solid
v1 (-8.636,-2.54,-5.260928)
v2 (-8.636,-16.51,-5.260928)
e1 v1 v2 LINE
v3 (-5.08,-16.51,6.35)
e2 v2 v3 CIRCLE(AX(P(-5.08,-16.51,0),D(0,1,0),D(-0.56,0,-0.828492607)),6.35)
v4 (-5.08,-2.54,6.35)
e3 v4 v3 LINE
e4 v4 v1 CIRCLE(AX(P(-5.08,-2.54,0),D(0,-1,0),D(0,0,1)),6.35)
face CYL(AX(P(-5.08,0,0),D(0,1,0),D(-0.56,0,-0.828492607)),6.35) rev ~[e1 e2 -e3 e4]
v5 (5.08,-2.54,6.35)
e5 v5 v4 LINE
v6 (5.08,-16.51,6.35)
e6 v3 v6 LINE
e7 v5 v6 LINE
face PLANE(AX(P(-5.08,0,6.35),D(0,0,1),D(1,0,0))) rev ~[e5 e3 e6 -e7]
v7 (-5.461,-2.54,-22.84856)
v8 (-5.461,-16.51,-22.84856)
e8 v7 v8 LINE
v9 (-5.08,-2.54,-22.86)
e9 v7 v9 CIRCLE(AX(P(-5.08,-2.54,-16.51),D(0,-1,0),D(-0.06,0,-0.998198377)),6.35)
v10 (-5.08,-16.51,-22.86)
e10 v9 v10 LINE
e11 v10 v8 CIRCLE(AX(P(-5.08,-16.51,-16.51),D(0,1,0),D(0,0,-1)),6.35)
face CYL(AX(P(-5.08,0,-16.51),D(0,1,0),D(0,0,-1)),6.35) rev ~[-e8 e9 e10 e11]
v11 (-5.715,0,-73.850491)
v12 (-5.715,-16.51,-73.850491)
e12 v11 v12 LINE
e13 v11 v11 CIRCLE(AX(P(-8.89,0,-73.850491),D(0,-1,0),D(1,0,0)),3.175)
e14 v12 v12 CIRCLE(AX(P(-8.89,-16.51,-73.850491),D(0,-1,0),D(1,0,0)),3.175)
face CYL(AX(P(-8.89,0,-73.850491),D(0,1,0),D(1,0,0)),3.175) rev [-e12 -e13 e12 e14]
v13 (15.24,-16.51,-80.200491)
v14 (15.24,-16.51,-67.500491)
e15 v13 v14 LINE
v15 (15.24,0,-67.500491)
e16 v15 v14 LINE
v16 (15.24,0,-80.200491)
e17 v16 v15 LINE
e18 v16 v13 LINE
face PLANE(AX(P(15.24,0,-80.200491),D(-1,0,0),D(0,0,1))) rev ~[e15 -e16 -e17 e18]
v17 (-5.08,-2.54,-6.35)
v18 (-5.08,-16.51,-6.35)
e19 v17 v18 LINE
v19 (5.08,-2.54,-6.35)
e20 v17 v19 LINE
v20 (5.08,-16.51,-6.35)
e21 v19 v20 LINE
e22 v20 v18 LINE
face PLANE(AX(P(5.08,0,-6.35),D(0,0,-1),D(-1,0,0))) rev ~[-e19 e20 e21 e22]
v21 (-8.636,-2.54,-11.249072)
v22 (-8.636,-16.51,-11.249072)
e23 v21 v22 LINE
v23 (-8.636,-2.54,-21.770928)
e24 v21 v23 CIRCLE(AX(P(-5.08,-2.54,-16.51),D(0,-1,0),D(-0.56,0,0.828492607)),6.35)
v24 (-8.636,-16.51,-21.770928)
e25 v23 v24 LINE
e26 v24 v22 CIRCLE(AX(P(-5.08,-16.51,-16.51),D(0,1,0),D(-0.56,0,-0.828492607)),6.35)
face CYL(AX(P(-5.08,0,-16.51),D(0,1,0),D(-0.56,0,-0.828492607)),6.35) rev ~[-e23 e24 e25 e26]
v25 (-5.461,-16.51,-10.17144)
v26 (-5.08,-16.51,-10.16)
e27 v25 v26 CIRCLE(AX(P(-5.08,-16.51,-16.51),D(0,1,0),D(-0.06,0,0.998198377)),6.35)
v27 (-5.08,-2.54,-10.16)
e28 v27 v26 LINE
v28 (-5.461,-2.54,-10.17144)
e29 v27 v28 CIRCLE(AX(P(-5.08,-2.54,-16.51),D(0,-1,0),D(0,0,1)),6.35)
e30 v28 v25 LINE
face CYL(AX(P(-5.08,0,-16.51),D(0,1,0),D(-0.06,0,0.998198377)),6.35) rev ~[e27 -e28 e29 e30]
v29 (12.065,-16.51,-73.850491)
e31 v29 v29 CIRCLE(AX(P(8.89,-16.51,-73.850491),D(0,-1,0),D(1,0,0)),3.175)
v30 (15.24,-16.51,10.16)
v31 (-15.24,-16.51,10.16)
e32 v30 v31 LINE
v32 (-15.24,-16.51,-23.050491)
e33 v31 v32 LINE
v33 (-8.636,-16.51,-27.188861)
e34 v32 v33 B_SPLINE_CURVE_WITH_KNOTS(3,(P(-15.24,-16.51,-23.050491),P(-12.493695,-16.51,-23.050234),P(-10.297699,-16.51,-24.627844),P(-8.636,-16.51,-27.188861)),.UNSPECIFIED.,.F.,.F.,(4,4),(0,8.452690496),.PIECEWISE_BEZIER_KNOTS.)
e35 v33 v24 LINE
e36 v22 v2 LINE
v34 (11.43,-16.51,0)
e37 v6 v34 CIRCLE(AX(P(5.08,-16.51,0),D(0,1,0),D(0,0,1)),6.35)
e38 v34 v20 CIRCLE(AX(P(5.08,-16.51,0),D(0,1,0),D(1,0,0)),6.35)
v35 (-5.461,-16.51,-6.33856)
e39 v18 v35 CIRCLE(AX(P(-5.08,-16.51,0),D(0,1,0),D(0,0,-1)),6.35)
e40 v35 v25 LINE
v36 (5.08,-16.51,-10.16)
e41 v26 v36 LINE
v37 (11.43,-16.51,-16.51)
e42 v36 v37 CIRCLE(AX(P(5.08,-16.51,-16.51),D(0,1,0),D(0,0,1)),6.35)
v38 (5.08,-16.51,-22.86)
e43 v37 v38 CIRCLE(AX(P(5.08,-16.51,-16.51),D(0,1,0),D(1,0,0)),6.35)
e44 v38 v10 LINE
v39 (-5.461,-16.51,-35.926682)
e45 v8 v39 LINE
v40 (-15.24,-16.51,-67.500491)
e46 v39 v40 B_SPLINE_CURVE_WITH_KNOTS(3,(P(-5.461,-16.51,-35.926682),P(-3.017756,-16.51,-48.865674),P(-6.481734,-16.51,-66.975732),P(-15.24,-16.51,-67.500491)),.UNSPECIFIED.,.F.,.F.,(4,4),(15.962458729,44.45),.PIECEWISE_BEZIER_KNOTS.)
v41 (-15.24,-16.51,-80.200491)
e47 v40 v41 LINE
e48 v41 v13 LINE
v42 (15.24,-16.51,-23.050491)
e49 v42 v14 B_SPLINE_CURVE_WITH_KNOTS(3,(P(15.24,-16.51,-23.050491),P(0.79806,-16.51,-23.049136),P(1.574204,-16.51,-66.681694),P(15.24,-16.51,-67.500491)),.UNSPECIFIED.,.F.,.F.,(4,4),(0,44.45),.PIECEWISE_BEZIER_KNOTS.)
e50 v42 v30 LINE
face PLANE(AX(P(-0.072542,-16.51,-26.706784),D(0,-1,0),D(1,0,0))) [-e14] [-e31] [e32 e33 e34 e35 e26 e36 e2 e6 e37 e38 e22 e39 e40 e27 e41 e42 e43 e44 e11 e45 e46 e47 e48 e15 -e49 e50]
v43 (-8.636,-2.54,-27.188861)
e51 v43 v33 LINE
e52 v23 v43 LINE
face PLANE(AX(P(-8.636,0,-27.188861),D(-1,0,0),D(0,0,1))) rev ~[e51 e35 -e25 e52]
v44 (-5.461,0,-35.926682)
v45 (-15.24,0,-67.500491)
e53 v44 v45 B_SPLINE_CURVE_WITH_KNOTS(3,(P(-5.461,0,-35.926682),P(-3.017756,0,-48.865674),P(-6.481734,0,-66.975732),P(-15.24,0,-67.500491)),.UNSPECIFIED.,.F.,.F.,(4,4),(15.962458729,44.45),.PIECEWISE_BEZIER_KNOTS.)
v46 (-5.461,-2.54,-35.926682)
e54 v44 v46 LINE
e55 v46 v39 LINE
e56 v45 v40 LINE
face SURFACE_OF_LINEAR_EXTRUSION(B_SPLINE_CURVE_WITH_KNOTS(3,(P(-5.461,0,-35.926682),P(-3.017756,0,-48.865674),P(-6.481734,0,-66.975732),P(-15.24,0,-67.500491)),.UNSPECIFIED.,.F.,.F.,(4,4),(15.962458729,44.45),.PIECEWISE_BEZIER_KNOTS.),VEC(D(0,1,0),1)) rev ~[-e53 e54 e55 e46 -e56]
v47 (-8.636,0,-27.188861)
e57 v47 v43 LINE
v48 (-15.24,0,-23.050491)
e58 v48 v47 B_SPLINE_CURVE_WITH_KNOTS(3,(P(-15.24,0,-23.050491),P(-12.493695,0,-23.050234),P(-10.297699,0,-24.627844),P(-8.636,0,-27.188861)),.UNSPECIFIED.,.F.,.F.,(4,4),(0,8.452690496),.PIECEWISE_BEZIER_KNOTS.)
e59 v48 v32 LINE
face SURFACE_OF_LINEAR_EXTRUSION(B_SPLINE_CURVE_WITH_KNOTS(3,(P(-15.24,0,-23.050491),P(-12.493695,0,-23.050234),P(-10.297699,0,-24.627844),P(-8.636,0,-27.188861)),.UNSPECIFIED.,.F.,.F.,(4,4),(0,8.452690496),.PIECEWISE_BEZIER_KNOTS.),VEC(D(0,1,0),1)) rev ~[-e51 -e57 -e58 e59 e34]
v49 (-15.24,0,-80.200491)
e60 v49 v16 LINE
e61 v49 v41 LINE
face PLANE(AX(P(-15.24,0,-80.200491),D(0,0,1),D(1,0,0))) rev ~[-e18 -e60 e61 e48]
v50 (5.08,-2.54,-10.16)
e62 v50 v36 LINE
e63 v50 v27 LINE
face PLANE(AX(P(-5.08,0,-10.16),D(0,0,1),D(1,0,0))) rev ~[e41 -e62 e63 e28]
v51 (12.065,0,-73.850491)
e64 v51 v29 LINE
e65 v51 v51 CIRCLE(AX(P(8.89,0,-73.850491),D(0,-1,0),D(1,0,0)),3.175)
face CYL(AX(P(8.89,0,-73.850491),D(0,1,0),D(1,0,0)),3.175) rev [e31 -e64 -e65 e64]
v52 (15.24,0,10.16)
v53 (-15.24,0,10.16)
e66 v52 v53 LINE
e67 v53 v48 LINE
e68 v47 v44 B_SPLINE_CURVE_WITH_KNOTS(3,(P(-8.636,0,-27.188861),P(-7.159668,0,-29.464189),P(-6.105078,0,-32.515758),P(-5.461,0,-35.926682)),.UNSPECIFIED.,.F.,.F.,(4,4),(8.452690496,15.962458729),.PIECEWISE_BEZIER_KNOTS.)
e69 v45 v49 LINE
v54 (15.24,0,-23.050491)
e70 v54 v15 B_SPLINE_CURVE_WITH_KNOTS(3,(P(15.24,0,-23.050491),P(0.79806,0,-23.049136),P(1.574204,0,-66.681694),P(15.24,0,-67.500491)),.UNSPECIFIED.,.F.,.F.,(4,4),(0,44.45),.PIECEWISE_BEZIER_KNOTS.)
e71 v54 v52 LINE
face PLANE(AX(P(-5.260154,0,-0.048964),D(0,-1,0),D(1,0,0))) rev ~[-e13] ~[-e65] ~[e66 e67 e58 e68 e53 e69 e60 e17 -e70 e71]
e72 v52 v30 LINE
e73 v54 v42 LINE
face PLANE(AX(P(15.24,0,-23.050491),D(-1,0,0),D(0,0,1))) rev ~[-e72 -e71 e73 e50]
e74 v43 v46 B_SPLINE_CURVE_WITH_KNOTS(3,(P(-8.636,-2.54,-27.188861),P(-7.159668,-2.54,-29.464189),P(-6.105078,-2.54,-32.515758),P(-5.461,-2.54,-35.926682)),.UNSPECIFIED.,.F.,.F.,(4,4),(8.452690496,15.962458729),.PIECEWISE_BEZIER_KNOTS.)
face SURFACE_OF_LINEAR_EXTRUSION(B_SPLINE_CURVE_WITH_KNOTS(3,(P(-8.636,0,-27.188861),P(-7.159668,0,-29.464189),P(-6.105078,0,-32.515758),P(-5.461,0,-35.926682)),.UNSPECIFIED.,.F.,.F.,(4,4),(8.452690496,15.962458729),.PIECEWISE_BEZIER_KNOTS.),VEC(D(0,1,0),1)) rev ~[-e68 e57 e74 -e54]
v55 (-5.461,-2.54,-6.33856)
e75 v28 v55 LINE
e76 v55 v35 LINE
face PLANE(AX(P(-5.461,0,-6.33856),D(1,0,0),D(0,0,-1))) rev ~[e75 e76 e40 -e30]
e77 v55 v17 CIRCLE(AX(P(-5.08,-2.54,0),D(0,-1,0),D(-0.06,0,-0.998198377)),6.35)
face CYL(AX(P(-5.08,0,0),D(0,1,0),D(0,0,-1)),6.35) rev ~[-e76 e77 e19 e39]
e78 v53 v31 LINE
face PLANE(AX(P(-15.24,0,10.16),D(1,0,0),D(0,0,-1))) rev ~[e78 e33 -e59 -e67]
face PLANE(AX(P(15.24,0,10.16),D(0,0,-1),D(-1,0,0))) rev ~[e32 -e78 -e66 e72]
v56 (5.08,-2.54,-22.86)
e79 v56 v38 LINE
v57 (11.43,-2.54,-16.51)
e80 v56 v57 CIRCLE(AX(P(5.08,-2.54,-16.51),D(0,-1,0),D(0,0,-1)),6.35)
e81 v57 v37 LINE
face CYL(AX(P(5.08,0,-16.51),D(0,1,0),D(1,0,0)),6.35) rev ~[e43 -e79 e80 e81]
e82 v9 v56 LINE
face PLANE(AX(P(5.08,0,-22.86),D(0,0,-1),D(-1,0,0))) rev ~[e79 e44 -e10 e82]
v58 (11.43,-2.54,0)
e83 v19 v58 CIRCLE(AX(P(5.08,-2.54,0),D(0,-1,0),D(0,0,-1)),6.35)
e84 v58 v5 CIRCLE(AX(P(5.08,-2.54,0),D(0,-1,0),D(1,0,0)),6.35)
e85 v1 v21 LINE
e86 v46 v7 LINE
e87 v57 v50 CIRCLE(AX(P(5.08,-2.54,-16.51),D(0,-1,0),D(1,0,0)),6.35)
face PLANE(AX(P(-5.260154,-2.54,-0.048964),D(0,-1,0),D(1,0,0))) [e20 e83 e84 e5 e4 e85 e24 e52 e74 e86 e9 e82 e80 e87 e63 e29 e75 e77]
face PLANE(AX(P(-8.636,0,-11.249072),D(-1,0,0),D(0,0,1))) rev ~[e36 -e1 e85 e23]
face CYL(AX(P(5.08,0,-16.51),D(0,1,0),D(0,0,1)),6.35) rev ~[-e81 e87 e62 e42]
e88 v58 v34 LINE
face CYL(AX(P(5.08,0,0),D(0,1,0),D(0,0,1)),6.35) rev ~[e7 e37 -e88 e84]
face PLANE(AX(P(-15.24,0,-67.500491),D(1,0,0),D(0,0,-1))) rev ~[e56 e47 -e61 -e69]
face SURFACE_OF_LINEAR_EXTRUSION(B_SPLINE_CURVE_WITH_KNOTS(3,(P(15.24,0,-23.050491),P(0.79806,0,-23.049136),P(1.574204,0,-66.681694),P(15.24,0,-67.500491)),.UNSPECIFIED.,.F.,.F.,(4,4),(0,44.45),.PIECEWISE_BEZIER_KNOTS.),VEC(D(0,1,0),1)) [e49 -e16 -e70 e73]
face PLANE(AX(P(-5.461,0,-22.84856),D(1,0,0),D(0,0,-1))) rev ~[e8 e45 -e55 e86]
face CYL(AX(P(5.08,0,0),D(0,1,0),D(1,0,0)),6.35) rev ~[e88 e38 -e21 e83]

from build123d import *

# Parameters (mm, degrees)
F0_R     = 3.175
F1_DEPTH = 16.51
F2_DEPTH = 2.54


# Not quite as in the source:
# - a feature names something its author has since deleted; it is built from what else it names


with BuildPart() as f1:
    # F0 (on Front) → F1 (new body)
    with BuildSketch(Plane.XZ):
        with BuildLine():
            Line((15.24, 10.16), (0, 10.16))
            Line((0, 10.16), (-15.24, 10.16))
            Line((-15.24, 10.16), (-15.24, -23.0504914403))
            add(Edge.make_bspline(
                [(-15.24, -23.0504914403), (-12.4936951429, -23.050233708), (-10.2976989889, -24.6278435924), (-8.636, -27.1888607202)],
                knots=[0, 0, 0, 0, 8.4526904957, 8.4526904957, 8.4526904957, 8.4526904957], degree=3))
            Line((-8.636, -27.1888607202), (-8.636, -21.770928055))
            ThreePointArc((-8.636, -21.770928055), (-11.43, -16.51), (-8.636, -11.249071945))
            Line((-8.636, -11.249071945), (-8.636, -5.260928055))
            ThreePointArc((-8.636, -5.260928055), (-11.1516304709, 1.8595169871), (-5.08, 6.35))
            Line((-5.08, 6.35), (5.08, 6.35))
            ThreePointArc((5.08, 6.35), (9.5701280605, 4.4901280605), (11.43, 0))
            ThreePointArc((11.43, 0), (9.5701280605, -4.4901280605), (5.08, -6.35))
            Line((5.08, -6.35), (-5.08, -6.35))
            ThreePointArc((-5.08, -6.35), (-5.2705858603, -6.3471392792), (-5.461, -6.3385596944))
            Line((-5.461, -6.3385596944), (-5.461, -10.1714403056))
            ThreePointArc((-5.461, -10.1714403056), (-5.2705858603, -10.1628607208), (-5.08, -10.16))
            Line((-5.08, -10.16), (5.08, -10.16))
            ThreePointArc((5.08, -10.16), (9.5701280605, -12.0198719395), (11.43, -16.51))
            ThreePointArc((11.43, -16.51), (9.5701280605, -21.0001280605), (5.08, -22.86))
            Line((5.08, -22.86), (-5.08, -22.86))
            ThreePointArc((-5.08, -22.86), (-5.2705858603, -22.8571392792), (-5.461, -22.8485596944))
            Line((-5.461, -22.8485596944), (-5.461, -35.926681818))
            add(Edge.make_bspline(
                [(-5.461, -35.926681818), (-3.0177559473, -48.8656738837), (-6.4817336355, -66.9757324356), (-15.24, -67.5004914403)],
                knots=[15.9624587288, 15.9624587288, 15.9624587288, 15.9624587288, 44.45, 44.45, 44.45, 44.45], degree=3))
            Line((-15.24, -67.5004914403), (-15.24, -80.2004914403))
            Line((-15.24, -80.2004914403), (0, -80.2004914403))
            Line((0, -80.2004914403), (15.24, -80.2004914403))
            Line((15.24, -80.2004914403), (15.24, -67.5004914403))
            add(Edge.make_bspline(
                [(15.24, -23.0504914403), (0.7980597731, -23.0491361081), (1.5742035665, -66.6816935827), (15.24, -67.5004914403)],
                knots=[0, 0, 0, 0, 44.45, 44.45, 44.45, 44.45], degree=3))
            Line((15.24, -23.0504914403), (15.24, 10.16))
        make_face()
        with Locations((-8.89, -73.8504914403)):
            Circle(F0_R, mode=Mode.SUBTRACT)
        with Locations((8.89, -73.8504914403)):
            Circle(F0_R, mode=Mode.SUBTRACT)
    extrude(amount=F1_DEPTH)

    # F0 (on Front) → F2 (join)
    with BuildSketch(Plane.XZ):
        with BuildLine():
            ThreePointArc((-5.08, 6.35), (-11.1516304709, 1.8595169871), (-8.636, -5.260928055))
            ThreePointArc((-8.636, -5.260928055), (-7.1209102718, -6.0130845048), (-5.461, -6.3385596944))
            ThreePointArc((-5.461, -6.3385596944), (-5.2705858603, -6.3471392792), (-5.08, -6.35))
            ThreePointArc((-5.08, -6.35), (-2.2401936686, -5.6796126628), (0, -3.81))
            ThreePointArc((0, -3.81), (-1.27, 0), (0, 3.81))
            ThreePointArc((0, 3.81), (-2.2401936686, 5.6796126628), (-5.08, 6.35))
        make_face()
        with BuildLine():
            ThreePointArc((5.08, 6.35), (2.2401936686, 5.6796126628), (0, 3.81))
            ThreePointArc((0, 3.81), (0.9441389426, 2.0080463142), (1.27, 0))
            ThreePointArc((1.27, 0), (0.9441389426, -2.0080463142), (0, -3.81))
            ThreePointArc((0, -3.81), (2.2401936686, -5.6796126628), (5.08, -6.35))
            ThreePointArc((5.08, -6.35), (9.5701280605, -4.4901280605), (11.43, 0))
            ThreePointArc((11.43, 0), (9.5701280605, 4.4901280605), (5.08, 6.35))
        make_face()
        with BuildLine():
            Line((5.08, 6.35), (-5.08, 6.35))
            ThreePointArc((-5.08, 6.35), (-2.2401936686, 5.6796126628), (0, 3.81))
            ThreePointArc((0, 3.81), (2.2401936686, 5.6796126628), (5.08, 6.35))
        make_face()
        with BuildLine():
            ThreePointArc((1.27, 0), (0.9441389426, 2.0080463142), (0, 3.81))
            ThreePointArc((0, 3.81), (-1.27, 0), (0, -3.81))
            ThreePointArc((0, -3.81), (0.9441389426, -2.0080463142), (1.27, 0))
        make_face()
        with BuildLine():
            ThreePointArc((0, -3.81), (-2.2401936686, -5.6796126628), (-5.08, -6.35))
            Line((-5.08, -6.35), (5.08, -6.35))
            ThreePointArc((5.08, -6.35), (2.2401936686, -5.6796126628), (0, -3.81))
        make_face()
        with BuildLine():
            Line((-5.461, -22.5981636269), (-5.461, -22.8485596944))
            ThreePointArc((-5.461, -22.8485596944), (-5.2705858603, -22.8571392792), (-5.08, -22.86))
            ThreePointArc((-5.08, -22.86), (-2.2401936686, -22.1896126628), (0, -20.32))
            ThreePointArc((0, -20.32), (-1.27, -16.51), (0, -12.7))
            ThreePointArc((0, -12.7), (-2.2401936686, -10.8303873372), (-5.08, -10.16))
            ThreePointArc((-5.08, -10.16), (-5.2705858603, -10.1628607208), (-5.461, -10.1714403056))
            Line((-5.461, -10.1714403056), (-5.461, -22.5981636269))
        make_face()
        with BuildLine():
            ThreePointArc((0, -12.7), (-1.27, -16.51), (0, -20.32))
            ThreePointArc((0, -20.32), (0.9441389426, -18.5180463142), (1.27, -16.51))
            ThreePointArc((1.27, -16.51), (0.9441389426, -14.5019536858), (0, -12.7))
        make_face()
        with BuildLine():
            Line((5.08, -10.16), (-5.08, -10.16))
            ThreePointArc((-5.08, -10.16), (-2.2401936686, -10.8303873372), (0, -12.7))
            ThreePointArc((0, -12.7), (2.2401936686, -10.8303873372), (5.08, -10.16))
        make_face()
        with BuildLine():
            ThreePointArc((1.27, -16.51), (0.9441389426, -18.5180463142), (0, -20.32))
            ThreePointArc((0, -20.32), (2.2401936686, -22.1896126628), (5.08, -22.86))
            ThreePointArc((5.08, -22.86), (9.5701280605, -21.0001280605), (11.43, -16.51))
            ThreePointArc((11.43, -16.51), (9.5701280605, -12.0198719395), (5.08, -10.16))
            ThreePointArc((5.08, -10.16), (2.2401936686, -10.8303873372), (0, -12.7))
            ThreePointArc((0, -12.7), (0.9441389426, -14.5019536858), (1.27, -16.51))
        make_face()
        with BuildLine():
            ThreePointArc((0, -20.32), (-2.2401936686, -22.1896126628), (-5.08, -22.86))
            Line((-5.08, -22.86), (5.08, -22.86))
            ThreePointArc((5.08, -22.86), (2.2401936686, -22.1896126628), (0, -20.32))
        make_face()
        with BuildLine():
            Line((-8.636, -21.770928055), (-8.636, -27.1888607202))
            add(Edge.make_bspline(
                [(-8.636, -27.1888607202), (-7.1596683768, -29.4641889225), (-6.1050779286, -32.5157580511), (-5.461, -35.926681818)],
                knots=[8.4526904957, 8.4526904957, 8.4526904957, 8.4526904957, 15.9624587288, 15.9624587288, 15.9624587288, 15.9624587288], degree=3))
            Line((-5.461, -35.926681818), (-5.461, -22.8485596944))
            ThreePointArc((-5.461, -22.8485596944), (-7.1209102718, -22.5230845048), (-8.636, -21.770928055))
        make_face()
        with BuildLine():
            Line((-8.636, -5.260928055), (-8.636, -11.249071945))
            ThreePointArc((-8.636, -11.249071945), (-7.1209102718, -10.4969154952), (-5.461, -10.1714403056))
            Line((-5.461, -10.1714403056), (-5.461, -6.3385596944))
            ThreePointArc((-5.461, -6.3385596944), (-7.1209102718, -6.0130845048), (-8.636, -5.260928055))
        make_face()
        with BuildLine():
            ThreePointArc((-8.636, -11.249071945), (-11.43, -16.51), (-8.636, -21.770928055))
            ThreePointArc((-8.636, -21.770928055), (-7.1209102718, -22.5230845048), (-5.461, -22.8485596944))
            Line((-5.461, -22.8485596944), (-5.461, -22.5981636269))
            Line((-5.461, -22.5981636269), (-5.461, -10.1714403056))
            ThreePointArc((-5.461, -10.1714403056), (-7.1209102718, -10.4969154952), (-8.636, -11.249071945))
        make_face()
    extrude(amount=F2_DEPTH)


solid = f1.part
